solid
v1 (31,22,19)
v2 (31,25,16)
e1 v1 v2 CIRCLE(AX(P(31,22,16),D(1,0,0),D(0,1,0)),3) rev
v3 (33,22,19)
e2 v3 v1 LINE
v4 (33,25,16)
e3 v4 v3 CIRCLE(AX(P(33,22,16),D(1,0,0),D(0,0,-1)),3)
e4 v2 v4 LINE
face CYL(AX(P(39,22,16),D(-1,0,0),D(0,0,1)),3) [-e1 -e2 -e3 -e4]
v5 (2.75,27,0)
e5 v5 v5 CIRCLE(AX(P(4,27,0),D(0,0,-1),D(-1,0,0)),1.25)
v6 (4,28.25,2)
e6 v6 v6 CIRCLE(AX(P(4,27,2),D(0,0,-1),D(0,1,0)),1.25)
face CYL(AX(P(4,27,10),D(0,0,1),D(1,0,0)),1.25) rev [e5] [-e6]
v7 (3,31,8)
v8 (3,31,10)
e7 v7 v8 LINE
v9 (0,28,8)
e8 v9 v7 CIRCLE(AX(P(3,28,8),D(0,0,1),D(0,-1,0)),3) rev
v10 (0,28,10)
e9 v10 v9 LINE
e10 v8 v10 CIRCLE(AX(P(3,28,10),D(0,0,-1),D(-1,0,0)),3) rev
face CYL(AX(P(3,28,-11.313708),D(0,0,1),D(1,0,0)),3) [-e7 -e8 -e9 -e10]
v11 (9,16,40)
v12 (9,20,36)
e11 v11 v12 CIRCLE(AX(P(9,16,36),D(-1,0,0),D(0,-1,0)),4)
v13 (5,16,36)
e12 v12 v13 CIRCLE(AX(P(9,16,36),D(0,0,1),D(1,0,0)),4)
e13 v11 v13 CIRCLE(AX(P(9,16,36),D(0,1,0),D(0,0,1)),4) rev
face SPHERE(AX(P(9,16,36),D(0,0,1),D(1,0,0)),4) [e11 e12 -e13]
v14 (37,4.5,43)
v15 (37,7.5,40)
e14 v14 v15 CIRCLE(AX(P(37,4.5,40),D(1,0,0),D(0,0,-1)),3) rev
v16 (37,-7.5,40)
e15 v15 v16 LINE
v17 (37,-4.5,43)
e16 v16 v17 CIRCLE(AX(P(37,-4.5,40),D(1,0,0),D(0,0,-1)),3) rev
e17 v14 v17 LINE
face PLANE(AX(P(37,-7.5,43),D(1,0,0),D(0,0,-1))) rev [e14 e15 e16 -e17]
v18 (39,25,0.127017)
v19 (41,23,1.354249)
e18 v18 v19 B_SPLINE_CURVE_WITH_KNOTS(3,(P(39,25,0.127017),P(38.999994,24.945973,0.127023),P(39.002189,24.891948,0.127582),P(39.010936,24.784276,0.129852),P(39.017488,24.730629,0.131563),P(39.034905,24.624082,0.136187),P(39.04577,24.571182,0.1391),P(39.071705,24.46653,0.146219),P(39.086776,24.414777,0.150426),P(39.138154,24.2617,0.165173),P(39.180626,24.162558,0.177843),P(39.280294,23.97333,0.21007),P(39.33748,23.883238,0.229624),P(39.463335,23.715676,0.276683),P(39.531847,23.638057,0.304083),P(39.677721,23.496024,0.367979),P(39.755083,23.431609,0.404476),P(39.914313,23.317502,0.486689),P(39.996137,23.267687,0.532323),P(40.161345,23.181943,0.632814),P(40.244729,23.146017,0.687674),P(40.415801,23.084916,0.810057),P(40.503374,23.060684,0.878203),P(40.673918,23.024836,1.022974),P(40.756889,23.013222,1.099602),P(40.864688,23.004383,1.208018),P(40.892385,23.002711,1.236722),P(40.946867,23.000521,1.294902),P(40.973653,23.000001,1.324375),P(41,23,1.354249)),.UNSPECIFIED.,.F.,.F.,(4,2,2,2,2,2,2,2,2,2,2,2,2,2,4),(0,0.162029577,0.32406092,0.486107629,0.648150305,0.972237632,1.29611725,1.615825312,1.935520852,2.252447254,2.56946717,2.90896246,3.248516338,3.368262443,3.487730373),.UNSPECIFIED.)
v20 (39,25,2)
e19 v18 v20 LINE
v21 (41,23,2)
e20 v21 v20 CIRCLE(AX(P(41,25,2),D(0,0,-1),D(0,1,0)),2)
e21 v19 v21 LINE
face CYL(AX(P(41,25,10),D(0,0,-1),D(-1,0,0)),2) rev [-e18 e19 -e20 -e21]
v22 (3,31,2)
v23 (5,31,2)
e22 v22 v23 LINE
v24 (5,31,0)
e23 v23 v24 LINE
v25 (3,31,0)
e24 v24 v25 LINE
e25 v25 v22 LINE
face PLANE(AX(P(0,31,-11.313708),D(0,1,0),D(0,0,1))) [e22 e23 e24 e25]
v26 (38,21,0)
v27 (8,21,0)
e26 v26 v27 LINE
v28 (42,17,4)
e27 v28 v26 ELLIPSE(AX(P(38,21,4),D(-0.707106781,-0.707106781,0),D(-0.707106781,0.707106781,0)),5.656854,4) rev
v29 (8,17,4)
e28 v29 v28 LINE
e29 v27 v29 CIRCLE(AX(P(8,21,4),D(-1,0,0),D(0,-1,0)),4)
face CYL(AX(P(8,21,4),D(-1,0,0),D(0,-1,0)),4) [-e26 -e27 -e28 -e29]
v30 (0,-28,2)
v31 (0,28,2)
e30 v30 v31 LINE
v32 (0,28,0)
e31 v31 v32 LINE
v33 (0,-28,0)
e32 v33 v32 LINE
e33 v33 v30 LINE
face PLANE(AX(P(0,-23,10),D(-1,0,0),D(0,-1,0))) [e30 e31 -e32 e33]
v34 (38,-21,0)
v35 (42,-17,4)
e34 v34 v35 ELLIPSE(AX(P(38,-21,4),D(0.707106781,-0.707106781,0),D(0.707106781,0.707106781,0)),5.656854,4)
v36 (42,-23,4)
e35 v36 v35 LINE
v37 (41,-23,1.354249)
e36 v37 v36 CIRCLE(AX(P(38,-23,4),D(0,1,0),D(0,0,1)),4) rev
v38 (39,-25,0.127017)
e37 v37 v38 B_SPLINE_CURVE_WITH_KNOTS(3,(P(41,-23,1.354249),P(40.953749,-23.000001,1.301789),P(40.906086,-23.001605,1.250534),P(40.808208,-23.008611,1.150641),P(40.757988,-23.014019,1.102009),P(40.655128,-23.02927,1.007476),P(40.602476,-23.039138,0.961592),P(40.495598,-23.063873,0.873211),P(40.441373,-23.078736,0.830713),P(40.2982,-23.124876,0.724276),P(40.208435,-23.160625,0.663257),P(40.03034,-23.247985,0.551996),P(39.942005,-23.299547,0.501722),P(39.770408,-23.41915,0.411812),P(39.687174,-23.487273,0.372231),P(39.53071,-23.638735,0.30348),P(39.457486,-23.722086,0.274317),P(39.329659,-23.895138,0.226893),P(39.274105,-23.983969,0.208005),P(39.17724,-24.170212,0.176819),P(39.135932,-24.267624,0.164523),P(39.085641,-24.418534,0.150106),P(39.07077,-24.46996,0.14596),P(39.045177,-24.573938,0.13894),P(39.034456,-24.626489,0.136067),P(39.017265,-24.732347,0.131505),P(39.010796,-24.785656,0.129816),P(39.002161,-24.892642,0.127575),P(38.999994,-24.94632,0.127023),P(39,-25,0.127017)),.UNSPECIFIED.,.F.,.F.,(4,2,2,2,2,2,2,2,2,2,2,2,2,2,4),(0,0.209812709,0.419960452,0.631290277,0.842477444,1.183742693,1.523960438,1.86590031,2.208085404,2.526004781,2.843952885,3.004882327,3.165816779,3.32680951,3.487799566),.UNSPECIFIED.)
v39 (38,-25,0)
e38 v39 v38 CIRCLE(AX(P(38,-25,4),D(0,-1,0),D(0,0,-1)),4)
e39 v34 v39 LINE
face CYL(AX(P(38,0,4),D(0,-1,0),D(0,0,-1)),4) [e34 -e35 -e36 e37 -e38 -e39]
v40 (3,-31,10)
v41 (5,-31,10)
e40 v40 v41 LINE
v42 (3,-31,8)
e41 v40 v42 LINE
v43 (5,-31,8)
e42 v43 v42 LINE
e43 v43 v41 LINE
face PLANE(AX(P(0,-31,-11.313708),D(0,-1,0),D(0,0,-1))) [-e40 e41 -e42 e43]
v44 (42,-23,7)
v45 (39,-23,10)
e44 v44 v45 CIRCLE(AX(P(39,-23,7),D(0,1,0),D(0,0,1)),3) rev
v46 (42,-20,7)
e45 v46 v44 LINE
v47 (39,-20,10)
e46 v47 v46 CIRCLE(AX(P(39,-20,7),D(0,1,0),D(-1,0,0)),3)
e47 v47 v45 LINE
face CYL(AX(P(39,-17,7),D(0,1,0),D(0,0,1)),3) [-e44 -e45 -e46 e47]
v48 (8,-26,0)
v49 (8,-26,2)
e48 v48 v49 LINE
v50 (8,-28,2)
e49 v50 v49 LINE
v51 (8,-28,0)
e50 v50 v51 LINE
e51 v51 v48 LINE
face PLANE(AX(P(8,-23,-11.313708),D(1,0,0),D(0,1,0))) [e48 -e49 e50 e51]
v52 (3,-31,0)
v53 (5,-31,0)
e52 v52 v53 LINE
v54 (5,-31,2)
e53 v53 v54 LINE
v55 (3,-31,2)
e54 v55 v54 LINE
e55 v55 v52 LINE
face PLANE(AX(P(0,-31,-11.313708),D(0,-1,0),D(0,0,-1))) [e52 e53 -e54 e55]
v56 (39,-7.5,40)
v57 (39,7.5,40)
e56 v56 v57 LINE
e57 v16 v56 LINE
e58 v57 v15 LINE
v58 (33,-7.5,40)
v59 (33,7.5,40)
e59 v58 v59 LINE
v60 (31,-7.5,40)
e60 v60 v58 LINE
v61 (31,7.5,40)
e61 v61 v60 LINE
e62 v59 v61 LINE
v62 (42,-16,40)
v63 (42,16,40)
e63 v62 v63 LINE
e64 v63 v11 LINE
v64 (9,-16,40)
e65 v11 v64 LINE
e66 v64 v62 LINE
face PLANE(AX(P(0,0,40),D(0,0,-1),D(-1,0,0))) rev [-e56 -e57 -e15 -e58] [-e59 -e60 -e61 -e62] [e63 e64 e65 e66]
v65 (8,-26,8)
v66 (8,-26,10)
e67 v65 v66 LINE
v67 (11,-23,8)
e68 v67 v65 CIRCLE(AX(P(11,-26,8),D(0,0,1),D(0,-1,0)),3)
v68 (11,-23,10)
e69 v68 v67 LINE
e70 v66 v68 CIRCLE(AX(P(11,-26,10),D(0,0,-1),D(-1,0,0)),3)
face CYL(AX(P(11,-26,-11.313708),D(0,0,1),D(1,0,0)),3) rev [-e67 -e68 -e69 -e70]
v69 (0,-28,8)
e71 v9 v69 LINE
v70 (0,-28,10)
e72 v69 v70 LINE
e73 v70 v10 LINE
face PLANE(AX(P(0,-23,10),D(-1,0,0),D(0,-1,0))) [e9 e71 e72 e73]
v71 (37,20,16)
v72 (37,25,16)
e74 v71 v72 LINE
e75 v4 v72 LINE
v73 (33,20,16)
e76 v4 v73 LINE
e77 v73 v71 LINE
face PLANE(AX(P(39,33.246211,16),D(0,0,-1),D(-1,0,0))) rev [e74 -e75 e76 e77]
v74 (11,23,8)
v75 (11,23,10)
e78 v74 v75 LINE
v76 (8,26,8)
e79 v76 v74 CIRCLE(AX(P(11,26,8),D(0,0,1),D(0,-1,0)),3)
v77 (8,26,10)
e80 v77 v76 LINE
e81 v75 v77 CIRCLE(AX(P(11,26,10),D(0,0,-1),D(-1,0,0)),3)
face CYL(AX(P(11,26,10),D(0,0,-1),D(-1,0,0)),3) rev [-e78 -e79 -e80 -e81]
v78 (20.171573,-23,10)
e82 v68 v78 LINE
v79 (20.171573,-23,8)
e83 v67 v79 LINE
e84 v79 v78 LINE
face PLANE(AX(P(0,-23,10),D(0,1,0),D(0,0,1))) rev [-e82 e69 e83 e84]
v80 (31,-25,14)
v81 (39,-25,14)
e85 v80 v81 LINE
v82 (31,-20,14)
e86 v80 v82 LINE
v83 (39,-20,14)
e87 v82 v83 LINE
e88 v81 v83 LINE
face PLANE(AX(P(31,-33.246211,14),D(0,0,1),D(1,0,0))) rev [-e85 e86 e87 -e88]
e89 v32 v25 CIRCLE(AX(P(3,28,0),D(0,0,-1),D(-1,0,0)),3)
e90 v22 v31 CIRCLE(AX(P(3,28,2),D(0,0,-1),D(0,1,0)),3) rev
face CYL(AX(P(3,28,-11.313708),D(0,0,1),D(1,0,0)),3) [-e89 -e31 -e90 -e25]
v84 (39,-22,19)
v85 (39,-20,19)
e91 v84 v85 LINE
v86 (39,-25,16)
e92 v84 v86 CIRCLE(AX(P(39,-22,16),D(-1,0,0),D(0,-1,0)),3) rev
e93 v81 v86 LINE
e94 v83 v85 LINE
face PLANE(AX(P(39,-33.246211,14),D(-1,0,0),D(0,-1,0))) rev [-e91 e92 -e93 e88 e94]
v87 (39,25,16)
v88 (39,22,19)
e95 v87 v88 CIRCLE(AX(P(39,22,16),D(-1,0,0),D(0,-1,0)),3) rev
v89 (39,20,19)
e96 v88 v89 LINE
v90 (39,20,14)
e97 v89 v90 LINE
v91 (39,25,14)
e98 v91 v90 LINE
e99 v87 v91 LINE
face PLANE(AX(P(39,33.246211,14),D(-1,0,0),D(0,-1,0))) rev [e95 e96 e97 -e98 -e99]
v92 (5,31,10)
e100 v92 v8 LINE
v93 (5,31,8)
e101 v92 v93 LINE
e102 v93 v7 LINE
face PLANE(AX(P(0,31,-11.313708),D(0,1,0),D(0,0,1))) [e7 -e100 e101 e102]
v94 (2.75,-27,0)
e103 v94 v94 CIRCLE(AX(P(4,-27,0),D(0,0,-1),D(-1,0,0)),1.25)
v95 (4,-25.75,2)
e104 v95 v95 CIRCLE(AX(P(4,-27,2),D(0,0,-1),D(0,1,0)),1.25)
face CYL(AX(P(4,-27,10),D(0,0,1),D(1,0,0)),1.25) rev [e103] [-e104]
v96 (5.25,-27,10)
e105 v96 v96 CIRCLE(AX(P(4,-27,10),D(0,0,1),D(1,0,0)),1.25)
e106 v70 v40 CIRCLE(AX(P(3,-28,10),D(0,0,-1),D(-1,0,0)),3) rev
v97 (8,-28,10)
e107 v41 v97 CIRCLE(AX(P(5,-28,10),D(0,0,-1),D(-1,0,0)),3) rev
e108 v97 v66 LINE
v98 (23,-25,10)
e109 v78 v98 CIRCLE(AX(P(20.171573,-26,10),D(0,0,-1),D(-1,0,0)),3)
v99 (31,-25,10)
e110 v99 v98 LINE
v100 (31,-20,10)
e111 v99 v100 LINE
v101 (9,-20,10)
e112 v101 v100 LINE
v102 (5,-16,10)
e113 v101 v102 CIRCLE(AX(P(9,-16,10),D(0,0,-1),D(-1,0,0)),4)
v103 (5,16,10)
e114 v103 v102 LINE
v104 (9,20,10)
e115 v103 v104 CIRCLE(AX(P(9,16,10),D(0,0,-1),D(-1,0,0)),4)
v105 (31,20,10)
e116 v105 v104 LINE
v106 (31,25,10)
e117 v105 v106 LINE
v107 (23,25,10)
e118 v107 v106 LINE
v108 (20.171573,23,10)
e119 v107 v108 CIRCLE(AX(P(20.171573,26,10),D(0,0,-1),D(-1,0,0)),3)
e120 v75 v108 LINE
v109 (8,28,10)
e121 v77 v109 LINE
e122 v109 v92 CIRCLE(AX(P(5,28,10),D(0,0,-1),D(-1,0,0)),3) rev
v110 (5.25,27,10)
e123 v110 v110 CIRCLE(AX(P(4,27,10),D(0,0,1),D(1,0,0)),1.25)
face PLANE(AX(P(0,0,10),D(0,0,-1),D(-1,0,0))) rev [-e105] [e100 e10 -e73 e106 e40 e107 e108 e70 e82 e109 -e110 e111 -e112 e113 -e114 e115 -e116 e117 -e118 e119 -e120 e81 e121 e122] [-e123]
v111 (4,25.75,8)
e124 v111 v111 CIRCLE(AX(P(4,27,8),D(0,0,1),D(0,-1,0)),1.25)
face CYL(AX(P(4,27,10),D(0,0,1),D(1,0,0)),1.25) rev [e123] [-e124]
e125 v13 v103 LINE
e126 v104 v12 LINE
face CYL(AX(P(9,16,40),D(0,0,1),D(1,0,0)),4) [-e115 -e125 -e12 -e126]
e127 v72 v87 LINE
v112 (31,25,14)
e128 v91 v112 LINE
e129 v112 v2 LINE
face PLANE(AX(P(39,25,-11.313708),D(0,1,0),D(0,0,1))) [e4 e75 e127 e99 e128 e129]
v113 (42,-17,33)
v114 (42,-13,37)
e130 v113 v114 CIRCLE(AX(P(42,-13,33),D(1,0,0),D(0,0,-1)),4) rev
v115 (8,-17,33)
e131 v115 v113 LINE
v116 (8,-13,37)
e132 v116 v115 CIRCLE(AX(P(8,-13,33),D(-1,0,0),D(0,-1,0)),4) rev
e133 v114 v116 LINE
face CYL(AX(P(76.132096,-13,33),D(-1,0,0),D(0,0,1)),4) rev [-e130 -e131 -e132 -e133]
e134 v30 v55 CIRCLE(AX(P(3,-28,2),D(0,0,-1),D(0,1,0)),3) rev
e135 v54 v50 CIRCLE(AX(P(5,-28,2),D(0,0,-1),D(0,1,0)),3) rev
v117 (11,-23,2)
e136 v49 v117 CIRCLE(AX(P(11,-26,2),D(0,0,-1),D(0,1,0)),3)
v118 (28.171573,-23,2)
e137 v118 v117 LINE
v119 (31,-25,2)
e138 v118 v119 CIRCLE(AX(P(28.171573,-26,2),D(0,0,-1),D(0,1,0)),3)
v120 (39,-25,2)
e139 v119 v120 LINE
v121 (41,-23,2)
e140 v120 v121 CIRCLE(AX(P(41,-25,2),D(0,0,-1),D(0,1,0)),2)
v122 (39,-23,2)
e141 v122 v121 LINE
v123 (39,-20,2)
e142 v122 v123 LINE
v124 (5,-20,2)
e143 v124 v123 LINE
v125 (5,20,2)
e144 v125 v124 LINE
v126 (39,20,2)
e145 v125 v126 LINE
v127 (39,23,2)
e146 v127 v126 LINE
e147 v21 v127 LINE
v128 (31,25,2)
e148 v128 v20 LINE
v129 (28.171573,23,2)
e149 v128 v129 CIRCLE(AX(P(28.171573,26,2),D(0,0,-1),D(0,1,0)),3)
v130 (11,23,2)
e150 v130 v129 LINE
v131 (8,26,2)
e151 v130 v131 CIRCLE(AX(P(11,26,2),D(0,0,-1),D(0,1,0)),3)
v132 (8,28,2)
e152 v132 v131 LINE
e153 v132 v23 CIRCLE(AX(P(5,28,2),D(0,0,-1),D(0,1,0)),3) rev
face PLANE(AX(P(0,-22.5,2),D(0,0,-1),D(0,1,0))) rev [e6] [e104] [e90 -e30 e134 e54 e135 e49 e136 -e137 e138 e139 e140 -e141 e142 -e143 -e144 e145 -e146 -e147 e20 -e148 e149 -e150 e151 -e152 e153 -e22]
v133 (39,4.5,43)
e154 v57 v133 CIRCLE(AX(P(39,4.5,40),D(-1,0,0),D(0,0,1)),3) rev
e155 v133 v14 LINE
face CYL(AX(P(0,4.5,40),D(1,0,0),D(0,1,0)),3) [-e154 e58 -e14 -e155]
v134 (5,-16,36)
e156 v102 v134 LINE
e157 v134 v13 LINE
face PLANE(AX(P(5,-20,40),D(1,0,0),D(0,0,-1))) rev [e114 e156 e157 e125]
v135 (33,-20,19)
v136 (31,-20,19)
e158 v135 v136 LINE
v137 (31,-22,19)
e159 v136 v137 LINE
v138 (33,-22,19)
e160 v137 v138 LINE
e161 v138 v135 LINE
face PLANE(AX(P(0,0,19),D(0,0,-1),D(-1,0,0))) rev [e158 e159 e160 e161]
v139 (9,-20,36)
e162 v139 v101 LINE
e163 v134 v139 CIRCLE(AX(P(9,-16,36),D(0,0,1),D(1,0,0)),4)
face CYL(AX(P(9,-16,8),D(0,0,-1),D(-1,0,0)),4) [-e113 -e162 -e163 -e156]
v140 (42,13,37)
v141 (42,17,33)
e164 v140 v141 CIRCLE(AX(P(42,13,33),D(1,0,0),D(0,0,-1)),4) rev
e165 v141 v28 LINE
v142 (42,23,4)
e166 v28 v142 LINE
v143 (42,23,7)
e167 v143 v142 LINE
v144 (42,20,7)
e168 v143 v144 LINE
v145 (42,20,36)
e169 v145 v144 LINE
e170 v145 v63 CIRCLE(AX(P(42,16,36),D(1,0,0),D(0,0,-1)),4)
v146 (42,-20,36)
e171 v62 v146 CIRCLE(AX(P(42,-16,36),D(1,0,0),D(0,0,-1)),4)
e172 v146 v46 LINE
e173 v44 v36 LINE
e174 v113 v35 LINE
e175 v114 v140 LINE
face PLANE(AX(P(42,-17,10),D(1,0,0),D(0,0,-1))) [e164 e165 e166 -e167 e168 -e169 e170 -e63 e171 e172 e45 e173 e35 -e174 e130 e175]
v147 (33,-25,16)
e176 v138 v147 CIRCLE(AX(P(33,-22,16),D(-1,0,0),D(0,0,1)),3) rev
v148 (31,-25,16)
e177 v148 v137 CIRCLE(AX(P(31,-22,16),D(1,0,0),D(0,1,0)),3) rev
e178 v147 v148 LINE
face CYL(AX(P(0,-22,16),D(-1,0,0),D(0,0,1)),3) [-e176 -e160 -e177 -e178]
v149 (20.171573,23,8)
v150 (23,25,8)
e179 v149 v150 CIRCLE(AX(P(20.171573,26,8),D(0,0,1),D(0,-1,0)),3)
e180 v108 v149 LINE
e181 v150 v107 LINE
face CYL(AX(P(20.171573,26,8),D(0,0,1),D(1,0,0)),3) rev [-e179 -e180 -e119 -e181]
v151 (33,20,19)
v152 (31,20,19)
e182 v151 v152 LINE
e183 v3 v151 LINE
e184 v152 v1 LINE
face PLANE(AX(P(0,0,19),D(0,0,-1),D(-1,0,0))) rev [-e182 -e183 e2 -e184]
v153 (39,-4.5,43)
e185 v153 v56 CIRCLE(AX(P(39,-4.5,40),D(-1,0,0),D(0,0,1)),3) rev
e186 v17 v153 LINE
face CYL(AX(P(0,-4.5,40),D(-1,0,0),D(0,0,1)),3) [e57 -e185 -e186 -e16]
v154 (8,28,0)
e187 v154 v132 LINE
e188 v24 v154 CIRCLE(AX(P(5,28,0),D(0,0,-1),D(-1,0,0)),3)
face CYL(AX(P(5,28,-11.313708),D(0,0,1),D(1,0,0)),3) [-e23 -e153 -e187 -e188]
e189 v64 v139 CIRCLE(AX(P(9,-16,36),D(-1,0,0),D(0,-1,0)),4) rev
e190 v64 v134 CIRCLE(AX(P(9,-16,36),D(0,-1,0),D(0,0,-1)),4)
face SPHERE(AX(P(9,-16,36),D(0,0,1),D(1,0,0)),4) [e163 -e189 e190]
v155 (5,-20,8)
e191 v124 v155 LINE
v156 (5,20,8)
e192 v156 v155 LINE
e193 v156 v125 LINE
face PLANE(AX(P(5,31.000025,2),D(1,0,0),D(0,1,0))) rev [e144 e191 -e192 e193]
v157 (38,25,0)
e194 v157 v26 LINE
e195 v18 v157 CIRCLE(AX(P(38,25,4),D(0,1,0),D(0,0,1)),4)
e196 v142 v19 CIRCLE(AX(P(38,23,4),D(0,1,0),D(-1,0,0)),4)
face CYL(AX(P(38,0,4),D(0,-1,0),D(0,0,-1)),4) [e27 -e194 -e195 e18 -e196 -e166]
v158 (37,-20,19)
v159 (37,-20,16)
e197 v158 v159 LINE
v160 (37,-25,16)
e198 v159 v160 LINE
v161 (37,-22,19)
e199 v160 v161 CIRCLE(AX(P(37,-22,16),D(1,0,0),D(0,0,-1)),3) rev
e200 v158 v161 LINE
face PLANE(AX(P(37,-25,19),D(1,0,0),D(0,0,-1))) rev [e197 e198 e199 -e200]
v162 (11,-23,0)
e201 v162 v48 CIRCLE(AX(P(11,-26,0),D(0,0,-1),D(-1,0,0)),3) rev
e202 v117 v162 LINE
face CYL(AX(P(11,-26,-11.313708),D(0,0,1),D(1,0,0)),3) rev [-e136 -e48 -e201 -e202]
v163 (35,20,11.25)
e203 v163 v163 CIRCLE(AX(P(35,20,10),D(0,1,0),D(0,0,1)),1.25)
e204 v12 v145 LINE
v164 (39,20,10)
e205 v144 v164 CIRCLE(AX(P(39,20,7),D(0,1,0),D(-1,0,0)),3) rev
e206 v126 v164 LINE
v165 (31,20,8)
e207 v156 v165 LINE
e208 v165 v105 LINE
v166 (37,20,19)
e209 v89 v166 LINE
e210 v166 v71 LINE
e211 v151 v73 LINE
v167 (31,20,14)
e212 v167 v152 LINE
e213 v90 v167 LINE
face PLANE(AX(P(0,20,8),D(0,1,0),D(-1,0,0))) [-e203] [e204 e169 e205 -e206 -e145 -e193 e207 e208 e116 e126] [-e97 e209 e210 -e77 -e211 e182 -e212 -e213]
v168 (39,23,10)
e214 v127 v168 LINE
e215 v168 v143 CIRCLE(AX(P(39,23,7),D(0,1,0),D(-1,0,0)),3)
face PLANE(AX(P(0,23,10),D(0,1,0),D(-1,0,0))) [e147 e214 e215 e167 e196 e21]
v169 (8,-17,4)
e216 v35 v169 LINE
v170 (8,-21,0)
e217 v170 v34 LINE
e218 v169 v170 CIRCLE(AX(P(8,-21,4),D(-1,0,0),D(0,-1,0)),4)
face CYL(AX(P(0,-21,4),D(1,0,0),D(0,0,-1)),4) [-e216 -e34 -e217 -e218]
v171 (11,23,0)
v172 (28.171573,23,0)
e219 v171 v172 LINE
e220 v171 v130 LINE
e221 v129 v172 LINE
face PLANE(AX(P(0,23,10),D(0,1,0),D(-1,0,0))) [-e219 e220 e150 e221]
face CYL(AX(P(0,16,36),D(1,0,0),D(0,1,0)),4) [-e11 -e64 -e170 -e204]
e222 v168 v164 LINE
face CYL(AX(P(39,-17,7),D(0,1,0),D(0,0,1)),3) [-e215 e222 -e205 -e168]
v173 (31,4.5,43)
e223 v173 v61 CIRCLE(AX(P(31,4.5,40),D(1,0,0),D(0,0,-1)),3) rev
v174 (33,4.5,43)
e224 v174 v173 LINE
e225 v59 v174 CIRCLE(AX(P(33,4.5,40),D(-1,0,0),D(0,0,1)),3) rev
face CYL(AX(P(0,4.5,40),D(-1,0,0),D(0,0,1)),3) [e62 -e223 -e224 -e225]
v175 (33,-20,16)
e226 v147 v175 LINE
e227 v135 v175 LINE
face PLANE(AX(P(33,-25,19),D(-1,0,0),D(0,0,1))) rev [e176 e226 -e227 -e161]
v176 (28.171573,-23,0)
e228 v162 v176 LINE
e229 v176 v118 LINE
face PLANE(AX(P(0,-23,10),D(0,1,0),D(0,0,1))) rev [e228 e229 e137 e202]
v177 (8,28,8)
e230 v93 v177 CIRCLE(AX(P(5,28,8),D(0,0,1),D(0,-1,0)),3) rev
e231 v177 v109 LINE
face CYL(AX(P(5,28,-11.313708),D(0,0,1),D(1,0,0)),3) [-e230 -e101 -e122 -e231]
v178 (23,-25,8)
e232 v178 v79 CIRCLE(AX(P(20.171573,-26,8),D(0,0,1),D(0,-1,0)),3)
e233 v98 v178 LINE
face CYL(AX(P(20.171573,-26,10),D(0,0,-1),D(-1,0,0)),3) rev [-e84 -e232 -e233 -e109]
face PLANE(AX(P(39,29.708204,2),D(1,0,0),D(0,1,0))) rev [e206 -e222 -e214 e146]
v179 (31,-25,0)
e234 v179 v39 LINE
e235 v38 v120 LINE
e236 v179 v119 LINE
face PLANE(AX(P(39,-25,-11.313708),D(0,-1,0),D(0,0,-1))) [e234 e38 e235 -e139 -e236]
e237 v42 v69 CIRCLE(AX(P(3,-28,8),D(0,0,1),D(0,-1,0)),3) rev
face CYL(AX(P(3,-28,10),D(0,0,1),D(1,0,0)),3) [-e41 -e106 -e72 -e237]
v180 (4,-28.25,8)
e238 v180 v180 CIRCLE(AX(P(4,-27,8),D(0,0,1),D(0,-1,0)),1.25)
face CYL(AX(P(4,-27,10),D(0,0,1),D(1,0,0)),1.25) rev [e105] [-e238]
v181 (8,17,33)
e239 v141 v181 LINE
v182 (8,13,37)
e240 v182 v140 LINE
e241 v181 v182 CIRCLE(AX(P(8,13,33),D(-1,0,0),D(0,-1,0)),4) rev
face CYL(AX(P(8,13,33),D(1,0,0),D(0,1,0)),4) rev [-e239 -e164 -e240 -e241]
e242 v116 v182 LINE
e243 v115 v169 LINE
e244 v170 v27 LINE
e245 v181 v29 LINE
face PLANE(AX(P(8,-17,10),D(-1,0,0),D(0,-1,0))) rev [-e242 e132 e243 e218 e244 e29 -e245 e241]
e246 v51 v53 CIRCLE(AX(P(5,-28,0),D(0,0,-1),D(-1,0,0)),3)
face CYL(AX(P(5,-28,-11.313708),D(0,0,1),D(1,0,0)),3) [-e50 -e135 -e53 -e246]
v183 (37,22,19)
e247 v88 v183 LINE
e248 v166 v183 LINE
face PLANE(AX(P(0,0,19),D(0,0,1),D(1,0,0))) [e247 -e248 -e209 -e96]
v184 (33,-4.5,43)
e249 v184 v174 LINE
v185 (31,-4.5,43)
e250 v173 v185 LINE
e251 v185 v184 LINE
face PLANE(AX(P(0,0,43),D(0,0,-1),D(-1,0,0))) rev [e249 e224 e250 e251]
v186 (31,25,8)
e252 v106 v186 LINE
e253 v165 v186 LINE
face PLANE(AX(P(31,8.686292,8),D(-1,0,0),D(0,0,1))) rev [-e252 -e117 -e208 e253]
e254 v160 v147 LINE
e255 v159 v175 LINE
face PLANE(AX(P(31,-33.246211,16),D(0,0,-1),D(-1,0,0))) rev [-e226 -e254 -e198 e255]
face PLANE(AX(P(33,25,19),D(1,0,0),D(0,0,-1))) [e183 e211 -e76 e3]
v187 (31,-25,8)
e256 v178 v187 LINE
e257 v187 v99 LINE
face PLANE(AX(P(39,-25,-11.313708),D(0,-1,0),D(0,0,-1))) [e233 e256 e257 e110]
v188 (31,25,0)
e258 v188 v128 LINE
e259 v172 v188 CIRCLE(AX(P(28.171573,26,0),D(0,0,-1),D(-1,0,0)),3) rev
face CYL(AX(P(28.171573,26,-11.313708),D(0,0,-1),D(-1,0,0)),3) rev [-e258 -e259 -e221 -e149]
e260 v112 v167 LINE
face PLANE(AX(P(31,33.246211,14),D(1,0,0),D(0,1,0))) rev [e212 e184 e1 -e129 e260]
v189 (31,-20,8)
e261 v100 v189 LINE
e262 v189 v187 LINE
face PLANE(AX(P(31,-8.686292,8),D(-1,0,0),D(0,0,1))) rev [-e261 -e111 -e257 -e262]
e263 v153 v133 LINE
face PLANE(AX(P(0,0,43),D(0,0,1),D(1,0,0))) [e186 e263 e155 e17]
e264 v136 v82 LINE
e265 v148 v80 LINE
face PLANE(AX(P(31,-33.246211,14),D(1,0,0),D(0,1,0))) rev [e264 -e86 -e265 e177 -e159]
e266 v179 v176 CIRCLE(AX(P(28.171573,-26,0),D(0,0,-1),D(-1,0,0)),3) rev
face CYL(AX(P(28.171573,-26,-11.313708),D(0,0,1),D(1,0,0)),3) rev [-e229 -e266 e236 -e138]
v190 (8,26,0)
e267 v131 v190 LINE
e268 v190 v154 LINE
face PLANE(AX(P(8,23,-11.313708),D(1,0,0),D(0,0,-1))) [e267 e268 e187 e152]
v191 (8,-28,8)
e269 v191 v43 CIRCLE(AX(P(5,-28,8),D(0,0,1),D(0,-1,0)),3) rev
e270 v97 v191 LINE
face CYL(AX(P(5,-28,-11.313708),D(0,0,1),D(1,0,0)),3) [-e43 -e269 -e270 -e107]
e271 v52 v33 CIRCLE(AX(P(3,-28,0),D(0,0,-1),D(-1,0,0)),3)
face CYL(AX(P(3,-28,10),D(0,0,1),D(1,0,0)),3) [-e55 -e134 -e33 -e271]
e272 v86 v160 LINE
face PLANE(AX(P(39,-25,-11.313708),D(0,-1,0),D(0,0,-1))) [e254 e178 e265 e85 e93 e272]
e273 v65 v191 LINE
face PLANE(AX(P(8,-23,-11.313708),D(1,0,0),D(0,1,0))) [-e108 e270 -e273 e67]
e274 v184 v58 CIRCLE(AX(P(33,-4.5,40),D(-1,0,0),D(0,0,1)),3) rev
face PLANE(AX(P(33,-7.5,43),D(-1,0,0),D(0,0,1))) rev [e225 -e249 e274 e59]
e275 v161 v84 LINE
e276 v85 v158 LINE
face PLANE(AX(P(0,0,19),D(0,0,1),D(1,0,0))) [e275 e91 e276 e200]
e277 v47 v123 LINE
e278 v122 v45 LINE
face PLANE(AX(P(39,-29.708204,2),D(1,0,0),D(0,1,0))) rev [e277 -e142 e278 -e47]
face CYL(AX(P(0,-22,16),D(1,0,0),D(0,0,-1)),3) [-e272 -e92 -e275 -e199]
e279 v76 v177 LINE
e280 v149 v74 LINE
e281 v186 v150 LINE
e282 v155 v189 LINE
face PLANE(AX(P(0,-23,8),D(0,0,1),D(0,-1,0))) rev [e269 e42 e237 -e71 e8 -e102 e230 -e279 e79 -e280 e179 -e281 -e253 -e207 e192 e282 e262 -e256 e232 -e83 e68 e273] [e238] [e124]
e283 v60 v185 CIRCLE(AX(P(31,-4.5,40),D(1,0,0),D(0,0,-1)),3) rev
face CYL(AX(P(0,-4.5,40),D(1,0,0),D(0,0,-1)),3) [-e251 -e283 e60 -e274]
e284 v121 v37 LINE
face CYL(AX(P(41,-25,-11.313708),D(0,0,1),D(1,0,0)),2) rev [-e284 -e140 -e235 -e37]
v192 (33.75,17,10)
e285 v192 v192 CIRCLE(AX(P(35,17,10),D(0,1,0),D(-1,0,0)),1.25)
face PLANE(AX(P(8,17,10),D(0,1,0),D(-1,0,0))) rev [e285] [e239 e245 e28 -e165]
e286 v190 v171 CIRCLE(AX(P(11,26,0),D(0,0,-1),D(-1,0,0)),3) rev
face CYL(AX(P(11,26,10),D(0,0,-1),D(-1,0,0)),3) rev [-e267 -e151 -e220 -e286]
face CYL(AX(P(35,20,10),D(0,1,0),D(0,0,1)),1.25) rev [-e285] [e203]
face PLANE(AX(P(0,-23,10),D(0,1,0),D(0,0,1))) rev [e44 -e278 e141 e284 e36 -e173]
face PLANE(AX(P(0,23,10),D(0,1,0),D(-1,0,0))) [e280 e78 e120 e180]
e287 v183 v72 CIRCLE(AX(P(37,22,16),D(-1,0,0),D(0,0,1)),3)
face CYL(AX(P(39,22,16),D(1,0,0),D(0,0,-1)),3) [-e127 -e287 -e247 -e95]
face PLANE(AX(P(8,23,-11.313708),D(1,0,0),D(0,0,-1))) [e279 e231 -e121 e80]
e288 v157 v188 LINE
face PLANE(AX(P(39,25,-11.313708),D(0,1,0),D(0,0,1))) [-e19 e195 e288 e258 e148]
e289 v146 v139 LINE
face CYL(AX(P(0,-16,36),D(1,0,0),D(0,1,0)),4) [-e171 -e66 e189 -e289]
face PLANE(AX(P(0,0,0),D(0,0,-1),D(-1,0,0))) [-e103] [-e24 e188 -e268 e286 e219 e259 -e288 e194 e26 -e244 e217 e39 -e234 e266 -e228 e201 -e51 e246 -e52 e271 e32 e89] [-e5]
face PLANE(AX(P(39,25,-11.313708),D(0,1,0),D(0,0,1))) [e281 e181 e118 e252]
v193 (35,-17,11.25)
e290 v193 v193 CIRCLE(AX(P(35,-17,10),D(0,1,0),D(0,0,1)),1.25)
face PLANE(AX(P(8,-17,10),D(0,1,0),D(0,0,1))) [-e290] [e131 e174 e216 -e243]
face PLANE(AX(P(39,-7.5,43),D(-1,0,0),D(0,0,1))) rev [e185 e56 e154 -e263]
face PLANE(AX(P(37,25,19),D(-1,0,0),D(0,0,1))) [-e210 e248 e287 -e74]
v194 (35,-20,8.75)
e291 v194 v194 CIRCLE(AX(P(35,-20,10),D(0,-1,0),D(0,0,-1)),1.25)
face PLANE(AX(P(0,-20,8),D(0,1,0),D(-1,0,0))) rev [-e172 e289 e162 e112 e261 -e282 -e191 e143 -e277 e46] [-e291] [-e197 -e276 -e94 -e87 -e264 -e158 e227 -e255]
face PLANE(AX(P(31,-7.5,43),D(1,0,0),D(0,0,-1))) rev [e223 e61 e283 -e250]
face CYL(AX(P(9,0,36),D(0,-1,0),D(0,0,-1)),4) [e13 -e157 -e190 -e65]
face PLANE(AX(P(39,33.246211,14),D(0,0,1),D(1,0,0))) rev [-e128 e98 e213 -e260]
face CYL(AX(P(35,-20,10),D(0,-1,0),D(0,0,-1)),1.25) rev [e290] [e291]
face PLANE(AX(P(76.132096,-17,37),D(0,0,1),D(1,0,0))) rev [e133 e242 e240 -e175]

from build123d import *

# Parameters (mm, degrees)
ESTRUSIONE_ESTRUSIONE1_DEPTH  = 10
SCHIZZO6_W                    = 8
SCHIZZO6_H                    = 8
SCHIZZO6_H_2                  = 2
ESTRUSIONE_ESTRUSIONE4_DEPTH  = 10
TAGLIO_ESTRUSIONE1_DEPTH      = 54.150729064
SCHIZZO4_W                    = 3
SCHIZZO4_H                    = 6
ESTRUSIONE_ESTRUSIONE2_DEPTH  = 3
SCHIZZO5_W                    = 3
SCHIZZO5_H                    = 6
ESTRUSIONE_ESTRUSIONE3_DEPTH  = 3
SCHIZZO3_W                    = 5
SCHIZZO3_H                    = 6
TAGLIO_ESTRUSIONE2_DEPTH      = 67.820655489
FORO_FILETTATO_M3X0_5_1_D     = 2.5
ESTRUSIONE_ESTRUSIONE5_DEPTH  = 30
SCHIZZO10_W                   = 3
SCHIZZO10_H                   = 34
ESTRUSIONE_ESTRUSIONE6_DEPTH  = 34
SCHIZZO18_W                   = 8
SCHIZZO18_H                   = 8
TAGLIO_ESTRUSIONE3_DEPTH      = 5
SCHIZZO24_W                   = 8
SCHIZZO24_H                   = 2
ESTRUSIONE_ESTRUSIONE9_DEPTH  = 5
SCHIZZO23_W                   = 8
SCHIZZO23_H                   = 8
TAGLIO_ESTRUSIONE4_DEPTH      = 5
SCHIZZO25_W                   = 8
SCHIZZO25_H                   = 2
ESTRUSIONE_ESTRUSIONE10_DEPTH = 5
FORO_FILETTATO_M3X0_5_4_D     = 2.5
FORO_FILETTATO_M3X0_5_4_DEPTH = 7.5
FORO_FILETTATO_M3X0_5_4_TIP   = 0.751075774
FORO_FILETTATO_M3X0_5_5_D     = 2.5
FORO_FILETTATO_M3X0_5_5_DEPTH = 7.5
FORO_FILETTATO_M3X0_5_5_TIP   = 0.751075774
SCHIZZO11_W                   = 2
SCHIZZO11_H                   = 15
ESTRUSIONE_ESTRUSIONE7_DEPTH  = 3
SCHIZZO12_W                   = 2
SCHIZZO12_H                   = 5
ESTRUSIONE_ESTRUSIONE8_DEPTH  = 3
SCHIZZO28_W                   = 8
SCHIZZO28_H                   = 2
ESTRUSIONE_ESTRUSIONE11_DEPTH = 2
SCHIZZO29_W                   = 8
SCHIZZO29_H                   = 2
ESTRUSIONE_ESTRUSIONE12_DEPTH = 2
RACCORDO1_R                   = 4
RACCORDO2_R                   = 3
RACCORDO30_R                  = 2


# Some blends are built 0.0001 mm under size
with BuildPart() as part:
    # Schizzo1 → Estrusione-Estrusione1 (new body)
    with BuildSketch(Plane.XY):
        Polygon((0, -23), (42, -23), (42, -17), (8, -17), (8, 17), (42, 17), (42, 23), (0, 23), align=None)
    extrude(amount=ESTRUSIONE_ESTRUSIONE1_DEPTH)

    # Schizzo6 → Estrusione-Estrusione4 (add)
    with BuildSketch(Plane.XY.offset(10)):
        with Locations((4, -27)):
            Rectangle(SCHIZZO6_W, SCHIZZO6_H)
        with Locations((4, 27)):
            Rectangle(SCHIZZO6_W, SCHIZZO6_H)
        with Locations((35, -24)):
            Rectangle(SCHIZZO6_W, SCHIZZO6_H_2)
        with Locations((35, 24)):
            Rectangle(SCHIZZO6_W, SCHIZZO6_H_2)
    extrude(amount=-ESTRUSIONE_ESTRUSIONE4_DEPTH)

    # Schizzo2 → Taglio-Estrusione1 (cut, through all)
    with BuildSketch(Plane(origin=(42, 0, 0), x_dir=(0, 0, -1), z_dir=(1, 0, 0))):
        Polygon((-8, -23), (-8, -41.817102562), (-2, -41.817102562), (-2, -22.5), (-2, -20), (-8, -20), align=None)
    taglio_estrusione1 = extrude(amount=-TAGLIO_ESTRUSIONE1_DEPTH, mode=Mode.SUBTRACT)

    # Schizzo4 → Estrusione-Estrusione2 (add)
    with BuildSketch(Plane(origin=(0, -20, 0), x_dir=(-1, 0, 0), z_dir=(0, -1, 0))):
        with Locations((-40.5, -5)):
            Rectangle(SCHIZZO4_W, SCHIZZO4_H)
    extrude(amount=ESTRUSIONE_ESTRUSIONE2_DEPTH)

    # Specchia1: Taglio-Estrusione1 across plane
    add(taglio_estrusione1.mirror(Plane.ZX), mode=Mode.SUBTRACT)

    # Schizzo5 → Estrusione-Estrusione3 (add)
    with BuildSketch(Plane(origin=(0, 20, 0), x_dir=(1, 0, 0), z_dir=(0, 1, 0))):
        with Locations((40.5, -5)):
            Rectangle(SCHIZZO5_W, SCHIZZO5_H)
    extrude(amount=ESTRUSIONE_ESTRUSIONE3_DEPTH)

    # Schizzo3 → Taglio-Estrusione2 (cut, through all)
    with BuildSketch(Plane.XZ.offset(20)):
        with Locations((2.5, 5)):
            Rectangle(SCHIZZO3_W, SCHIZZO3_H)
    extrude(amount=-TAGLIO_ESTRUSIONE2_DEPTH, mode=Mode.SUBTRACT)

    # Foro filettato M3x0.5-1 (through all)
    with Locations(Plane.XY.offset(10)):
        with Locations((4, -27), (4, 27)):
            Hole(FORO_FILETTATO_M3X0_5_1_D / 2)

    # Schizzo9 → Estrusione-Estrusione5 (add)
    with BuildSketch(Plane.XY.offset(10)):
        Polygon((5, -20), (42, -20), (42, -17), (8, -17), (8, 17), (42, 17), (42, 20), (5, 20), align=None)
    extrude(amount=ESTRUSIONE_ESTRUSIONE5_DEPTH)

    # Schizzo10 → Estrusione-Estrusione6 (add)
    with BuildSketch(Plane(origin=(8, 0, 0), x_dir=(0, 0, -1), z_dir=(1, 0, 0))):
        with Locations((-38.5, 0)):
            Rectangle(SCHIZZO10_W, SCHIZZO10_H)
    extrude(amount=ESTRUSIONE_ESTRUSIONE6_DEPTH)

    # Schizzo18 → Taglio-Estrusione3 (cut)
    with BuildSketch(Plane.XZ.offset(25)):
        with Locations((35, 12)):
            Rectangle(SCHIZZO18_W, SCHIZZO18_H)
    extrude(amount=-TAGLIO_ESTRUSIONE3_DEPTH, mode=Mode.SUBTRACT)

    # Schizzo24 → Estrusione-Estrusione9 (add)
    with BuildSketch(Plane.XZ.offset(20)):
        with Locations((35, 15)):
            Rectangle(SCHIZZO24_W, SCHIZZO24_H)
    extrude(amount=ESTRUSIONE_ESTRUSIONE9_DEPTH)

    # Schizzo23 → Taglio-Estrusione4 (cut)
    with BuildSketch(Plane(origin=(0, 25, 0), x_dir=(1, 0, 0), z_dir=(0, 1, 0))):
        with Locations((35, -12)):
            Rectangle(SCHIZZO23_W, SCHIZZO23_H)
    extrude(amount=-TAGLIO_ESTRUSIONE4_DEPTH, mode=Mode.SUBTRACT)

    # Schizzo25 → Estrusione-Estrusione10 (add)
    with BuildSketch(Plane(origin=(0, 20, 0), x_dir=(1, 0, 0), z_dir=(0, 1, 0))):
        with Locations((35, -15)):
            Rectangle(SCHIZZO25_W, SCHIZZO25_H)
    extrude(amount=ESTRUSIONE_ESTRUSIONE10_DEPTH)

    # Foro filettato M3x0.5-4
    with Locations(Plane(origin=(0, -20, 0), x_dir=(-1, 0, 0), z_dir=(0, -1, 0))):
        with Locations((-35, -10)):
            Hole(FORO_FILETTATO_M3X0_5_4_D / 2, depth=FORO_FILETTATO_M3X0_5_4_DEPTH)
            with Locations((0, 0, -(FORO_FILETTATO_M3X0_5_4_DEPTH + FORO_FILETTATO_M3X0_5_4_TIP / 2))):  # 118° drill point
                Cone(0, FORO_FILETTATO_M3X0_5_4_D / 2, FORO_FILETTATO_M3X0_5_4_TIP, mode=Mode.SUBTRACT)

    # Foro filettato M3x0.5-5
    with Locations(Plane(origin=(0, 20, 0), x_dir=(1, 0, 0), z_dir=(0, 1, 0))):
        with Locations((35, -10)):
            Hole(FORO_FILETTATO_M3X0_5_5_D / 2, depth=FORO_FILETTATO_M3X0_5_5_DEPTH)
            with Locations((0, 0, -(FORO_FILETTATO_M3X0_5_5_DEPTH + FORO_FILETTATO_M3X0_5_5_TIP / 2))):  # 118° drill point
                Cone(0, FORO_FILETTATO_M3X0_5_5_D / 2, FORO_FILETTATO_M3X0_5_5_TIP, mode=Mode.SUBTRACT)

    # Schizzo11 → Estrusione-Estrusione7 (add)
    with BuildSketch(Plane.XY.offset(40)):
        with Locations((38, 0)):
            Rectangle(SCHIZZO11_W, SCHIZZO11_H)
        with Locations((32, 0)):
            Rectangle(SCHIZZO11_W, SCHIZZO11_H)
    extrude(amount=ESTRUSIONE_ESTRUSIONE7_DEPTH)

    # Schizzo12 → Estrusione-Estrusione8 (add)
    with BuildSketch(Plane.XY.offset(16)):
        with Locations((38, -22.5)):
            Rectangle(SCHIZZO12_W, SCHIZZO12_H)
        with Locations((32, -22.5)):
            Rectangle(SCHIZZO12_W, SCHIZZO12_H)
    estrusione_estrusione8 = extrude(amount=ESTRUSIONE_ESTRUSIONE8_DEPTH)

    # Schizzo28 → Estrusione-Estrusione11 (add)
    with BuildSketch(Plane.XZ.offset(23)):
        with Locations((27, 9)):
            Rectangle(SCHIZZO28_W, SCHIZZO28_H)
    extrude(amount=ESTRUSIONE_ESTRUSIONE11_DEPTH)

    # Schizzo29 → Estrusione-Estrusione12 (add)
    with BuildSketch(Plane(origin=(0, 23, 0), x_dir=(1, 0, 0), z_dir=(0, 1, 0))):
        with Locations((27, -9)):
            Rectangle(SCHIZZO29_W, SCHIZZO29_H)
    extrude(amount=ESTRUSIONE_ESTRUSIONE12_DEPTH)

    # Specchia2: Estrusione-Estrusione8 across plane
    add(estrusione_estrusione8.mirror(Plane.ZX))

    # Raccordo1
    raccordo1_edges = [part.edges().sort_by_distance(p)[0] for p in [
        (23.5, -20, 40),
        (23.5, 20, 40),
        (5, 0, 40),
        (5, 20, 25),
        (5, -20, 25),
        (42, 20, 0),
        (42, -20, 0),
        (25, -17, 37),
        (25, -17, 0),
        (25, 17, 37),
        (25, 17, 0),
    ]]
    fillet(raccordo1_edges, radius=RACCORDO1_R)

    # Raccordo2
    # the kernel refuses this fillet: 3 mm, written as the material it adds along each edge
    with BuildSketch(Plane(origin=(8, 23, 9.5), x_dir=(1, 0, 0), z_dir=(0, 0, -1))) as raccordo2_piece_1_section:
        with BuildLine():
            CenterArc((RACCORDO2_R, -RACCORDO2_R), RACCORDO2_R, 90, 90)
            Line((0, -RACCORDO2_R), (0, 0))
            Line((0, 0), (RACCORDO2_R, 0))
        make_face()
    raccordo2_piece_1 = extrude(amount=17, mode=Mode.PRIVATE)
    raccordo2_piece_1 = split(raccordo2_piece_1, bisect_by=Plane(origin=(8, 23, 8), z_dir=(0, 0, 1)), keep=Keep.TOP, mode=Mode.PRIVATE)
    add(raccordo2_piece_1)
    with BuildSketch(Plane(origin=(8, 23, 2), x_dir=(1, 0, 0), z_dir=(0, 0, -1)), Plane(origin=(8, -23, 2), x_dir=(0, -1, 0), z_dir=(0, 0, -1))) as raccordo2_piece_2:
        with BuildLine():
            CenterArc((RACCORDO2_R, -RACCORDO2_R), RACCORDO2_R, 90, 90)
            Line((0, -RACCORDO2_R), (0, 0))
            Line((0, 0), (RACCORDO2_R, 0))
        make_face()
    extrude(amount=2)
    with BuildSketch(Plane(origin=(8, 23, 10), x_dir=(0, 1, 0), z_dir=(0, 0, -1)), Plane(origin=(8, -23, 10), x_dir=(1, 0, 0), z_dir=(0, 0, -1))) as raccordo2_piece_3:
        with BuildLine():
            CenterArc((RACCORDO2_R, RACCORDO2_R), RACCORDO2_R, 180, 90)
            Line((0, RACCORDO2_R), (0, 0))
            Line((0, 0), (RACCORDO2_R, 0))
        make_face()
    extrude(amount=2)
    with BuildSketch(Plane(origin=(8, 23, 17.5), x_dir=(0, 1, 0), z_dir=(0, 0, -1))) as raccordo2_piece_4_section:
        with BuildLine():
            CenterArc((RACCORDO2_R, RACCORDO2_R), RACCORDO2_R, 180, 90)
            Line((0, RACCORDO2_R), (0, 0))
            Line((0, 0), (RACCORDO2_R, 0))
        make_face()
    raccordo2_piece_4 = extrude(amount=17, mode=Mode.PRIVATE)
    raccordo2_piece_4 = split(raccordo2_piece_4, bisect_by=Plane(origin=(8, 23, 2), z_dir=(0, 0, -1)), keep=Keep.TOP, mode=Mode.PRIVATE)
    add(raccordo2_piece_4)
    with BuildSketch(Plane(origin=(8, -23, 9.5), x_dir=(0, -1, 0), z_dir=(0, 0, -1))) as raccordo2_piece_5_section:
        with BuildLine():
            CenterArc((RACCORDO2_R, -RACCORDO2_R), RACCORDO2_R, 90, 90)
            Line((0, -RACCORDO2_R), (0, 0))
            Line((0, 0), (RACCORDO2_R, 0))
        make_face()
    raccordo2_piece_5 = extrude(amount=17, mode=Mode.PRIVATE)
    raccordo2_piece_5 = split(raccordo2_piece_5, bisect_by=Plane(origin=(8, -23, 8), z_dir=(0, 0, 1)), keep=Keep.TOP, mode=Mode.PRIVATE)
    add(raccordo2_piece_5)
    with BuildSketch(Plane(origin=(8, -23, 17.5), x_dir=(1, 0, 0), z_dir=(0, 0, -1))) as raccordo2_piece_6_section:
        with BuildLine():
            CenterArc((RACCORDO2_R, RACCORDO2_R), RACCORDO2_R, 180, 90)
            Line((0, RACCORDO2_R), (0, 0))
            Line((0, 0), (RACCORDO2_R, 0))
        make_face()
    raccordo2_piece_6 = extrude(amount=17, mode=Mode.PRIVATE)
    raccordo2_piece_6 = split(raccordo2_piece_6, bisect_by=Plane(origin=(8, -23, 2), z_dir=(0, 0, -1)), keep=Keep.TOP, mode=Mode.PRIVATE)
    add(raccordo2_piece_6)
    with BuildSketch(Plane(origin=(23, 23, 8), x_dir=(-1, 0, 0), z_dir=(0, 0, 1)), Plane(origin=(31, -23, 2), x_dir=(-1, 0, 0), z_dir=(0, 0, -1))) as raccordo2_piece_7:
        with BuildLine():
            CenterArc((2.828427125, -3), RACCORDO2_R, 90, 70.528779366)
            Line((0, -2), (0, 0))
            Line((0, 0), (2.828427125, 0))
        make_face()
    extrude(amount=2)
    with BuildSketch(Plane(origin=(31, 23, 2), x_dir=(0, 1, 0), z_dir=(0, 0, -1))) as raccordo2_piece_8:
        with BuildLine():
            CenterArc((3, -2.828427125), RACCORDO2_R, 109.471220634, 70.528779366)
            Line((0, -2.828427125), (0, 0))
            Line((0, 0), (2, 0))
        make_face()
    extrude(amount=2)
    with BuildSketch(Plane(origin=(23, -23, 10), x_dir=(0, -1, 0), z_dir=(0, 0, -1))) as raccordo2_piece_9:
        with BuildLine():
            CenterArc((3, 2.828427125), RACCORDO2_R, 180, 70.528779366)
            Line((0, 2.828427125), (0, 0))
            Line((0, 0), (2, 0))
        make_face()
    extrude(amount=2)
    # the kernel refuses this fillet: 3 mm, written as the material it takes off along each edge
    with BuildSketch(Plane(origin=(23.5, 25, 19), x_dir=(0, 0, -1), z_dir=(1, 0, 0)), Plane(origin=(40.5, 7.5, 43), x_dir=(0, -1, 0), z_dir=(-1, 0, 0)), Plane(origin=(23.5, -7.5, 43), x_dir=(0, 1, 0), z_dir=(1, 0, 0)), Plane(origin=(46.5, -7.5, 43), x_dir=(0, 0, -1), z_dir=(-1, 0, 0)), Plane(origin=(46.5, -25, 19), x_dir=(0, 0, -1), z_dir=(-1, 0, 0)), Plane(origin=(8, -31, 17.5), x_dir=(0, 1, 0), z_dir=(0, 0, -1)), Plane(origin=(0, -31, 17.5), x_dir=(1, 0, 0), z_dir=(0, 0, -1)), Plane(origin=(0, 31, 17.5), x_dir=(0, -1, 0), z_dir=(0, 0, -1)), Plane(origin=(8, 31, 17.5), x_dir=(-1, 0, 0), z_dir=(0, 0, -1))) as raccordo2_2_piece_1:
        with BuildLine():
            CenterArc((RACCORDO2_R, -RACCORDO2_R), RACCORDO2_R, 90, 90)
            Line((0, -RACCORDO2_R), (0, 0))
            Line((0, 0), (RACCORDO2_R, 0))
        make_face()
    extrude(amount=17, mode=Mode.SUBTRACT)
    with BuildSketch(Plane(origin=(46.5, 25, 19), x_dir=(0, 0, -1), z_dir=(-1, 0, 0)), Plane(origin=(29.5, 7.5, 43), x_dir=(0, -1, 0), z_dir=(1, 0, 0)), Plane(origin=(23.5, -25, 19), x_dir=(0, 0, -1), z_dir=(1, 0, 0)), Plane(origin=(8, -31, 9.5), x_dir=(-1, 0, 0), z_dir=(0, 0, -1)), Plane(origin=(0, -31, 9.5), x_dir=(0, 1, 0), z_dir=(0, 0, -1)), Plane(origin=(0, 31, 9.5), x_dir=(1, 0, 0), z_dir=(0, 0, -1)), Plane(origin=(8, 31, 9.5), x_dir=(0, -1, 0), z_dir=(0, 0, -1))) as raccordo2_2_piece_2:
        with BuildLine():
            CenterArc((RACCORDO2_R, RACCORDO2_R), RACCORDO2_R, 180, 90)
            Line((0, RACCORDO2_R), (0, 0))
            Line((0, 0), (RACCORDO2_R, 0))
        make_face()
    extrude(amount=17, mode=Mode.SUBTRACT)
    with BuildSketch(Plane(origin=(42, 20, 10), x_dir=(-1, 0, 0), z_dir=(0, 1, 0)), Plane(origin=(42, -30.5, 10), x_dir=(-1, 0, 0), z_dir=(0, 1, 0))) as raccordo2_2_piece_3:
        with BuildLine():
            CenterArc((RACCORDO2_R, -RACCORDO2_R), RACCORDO2_R, 90, 90)
            Line((0, -RACCORDO2_R), (0, 0))
            Line((0, 0), (RACCORDO2_R, 0))
        make_face()
    extrude(amount=10.5, mode=Mode.SUBTRACT)

    # Raccordo30
    raccordo30_edges = [part.edges().sort_by_distance(p)[0] for p in [
        (39, 23, 1.063508327),
        (39, -23, 1.063508327),
    ]]
    fillet(raccordo30_edges, radius=RACCORDO30_R - 0.0001)  # a hair under: the kernel refuses the full size


solid = part.part
